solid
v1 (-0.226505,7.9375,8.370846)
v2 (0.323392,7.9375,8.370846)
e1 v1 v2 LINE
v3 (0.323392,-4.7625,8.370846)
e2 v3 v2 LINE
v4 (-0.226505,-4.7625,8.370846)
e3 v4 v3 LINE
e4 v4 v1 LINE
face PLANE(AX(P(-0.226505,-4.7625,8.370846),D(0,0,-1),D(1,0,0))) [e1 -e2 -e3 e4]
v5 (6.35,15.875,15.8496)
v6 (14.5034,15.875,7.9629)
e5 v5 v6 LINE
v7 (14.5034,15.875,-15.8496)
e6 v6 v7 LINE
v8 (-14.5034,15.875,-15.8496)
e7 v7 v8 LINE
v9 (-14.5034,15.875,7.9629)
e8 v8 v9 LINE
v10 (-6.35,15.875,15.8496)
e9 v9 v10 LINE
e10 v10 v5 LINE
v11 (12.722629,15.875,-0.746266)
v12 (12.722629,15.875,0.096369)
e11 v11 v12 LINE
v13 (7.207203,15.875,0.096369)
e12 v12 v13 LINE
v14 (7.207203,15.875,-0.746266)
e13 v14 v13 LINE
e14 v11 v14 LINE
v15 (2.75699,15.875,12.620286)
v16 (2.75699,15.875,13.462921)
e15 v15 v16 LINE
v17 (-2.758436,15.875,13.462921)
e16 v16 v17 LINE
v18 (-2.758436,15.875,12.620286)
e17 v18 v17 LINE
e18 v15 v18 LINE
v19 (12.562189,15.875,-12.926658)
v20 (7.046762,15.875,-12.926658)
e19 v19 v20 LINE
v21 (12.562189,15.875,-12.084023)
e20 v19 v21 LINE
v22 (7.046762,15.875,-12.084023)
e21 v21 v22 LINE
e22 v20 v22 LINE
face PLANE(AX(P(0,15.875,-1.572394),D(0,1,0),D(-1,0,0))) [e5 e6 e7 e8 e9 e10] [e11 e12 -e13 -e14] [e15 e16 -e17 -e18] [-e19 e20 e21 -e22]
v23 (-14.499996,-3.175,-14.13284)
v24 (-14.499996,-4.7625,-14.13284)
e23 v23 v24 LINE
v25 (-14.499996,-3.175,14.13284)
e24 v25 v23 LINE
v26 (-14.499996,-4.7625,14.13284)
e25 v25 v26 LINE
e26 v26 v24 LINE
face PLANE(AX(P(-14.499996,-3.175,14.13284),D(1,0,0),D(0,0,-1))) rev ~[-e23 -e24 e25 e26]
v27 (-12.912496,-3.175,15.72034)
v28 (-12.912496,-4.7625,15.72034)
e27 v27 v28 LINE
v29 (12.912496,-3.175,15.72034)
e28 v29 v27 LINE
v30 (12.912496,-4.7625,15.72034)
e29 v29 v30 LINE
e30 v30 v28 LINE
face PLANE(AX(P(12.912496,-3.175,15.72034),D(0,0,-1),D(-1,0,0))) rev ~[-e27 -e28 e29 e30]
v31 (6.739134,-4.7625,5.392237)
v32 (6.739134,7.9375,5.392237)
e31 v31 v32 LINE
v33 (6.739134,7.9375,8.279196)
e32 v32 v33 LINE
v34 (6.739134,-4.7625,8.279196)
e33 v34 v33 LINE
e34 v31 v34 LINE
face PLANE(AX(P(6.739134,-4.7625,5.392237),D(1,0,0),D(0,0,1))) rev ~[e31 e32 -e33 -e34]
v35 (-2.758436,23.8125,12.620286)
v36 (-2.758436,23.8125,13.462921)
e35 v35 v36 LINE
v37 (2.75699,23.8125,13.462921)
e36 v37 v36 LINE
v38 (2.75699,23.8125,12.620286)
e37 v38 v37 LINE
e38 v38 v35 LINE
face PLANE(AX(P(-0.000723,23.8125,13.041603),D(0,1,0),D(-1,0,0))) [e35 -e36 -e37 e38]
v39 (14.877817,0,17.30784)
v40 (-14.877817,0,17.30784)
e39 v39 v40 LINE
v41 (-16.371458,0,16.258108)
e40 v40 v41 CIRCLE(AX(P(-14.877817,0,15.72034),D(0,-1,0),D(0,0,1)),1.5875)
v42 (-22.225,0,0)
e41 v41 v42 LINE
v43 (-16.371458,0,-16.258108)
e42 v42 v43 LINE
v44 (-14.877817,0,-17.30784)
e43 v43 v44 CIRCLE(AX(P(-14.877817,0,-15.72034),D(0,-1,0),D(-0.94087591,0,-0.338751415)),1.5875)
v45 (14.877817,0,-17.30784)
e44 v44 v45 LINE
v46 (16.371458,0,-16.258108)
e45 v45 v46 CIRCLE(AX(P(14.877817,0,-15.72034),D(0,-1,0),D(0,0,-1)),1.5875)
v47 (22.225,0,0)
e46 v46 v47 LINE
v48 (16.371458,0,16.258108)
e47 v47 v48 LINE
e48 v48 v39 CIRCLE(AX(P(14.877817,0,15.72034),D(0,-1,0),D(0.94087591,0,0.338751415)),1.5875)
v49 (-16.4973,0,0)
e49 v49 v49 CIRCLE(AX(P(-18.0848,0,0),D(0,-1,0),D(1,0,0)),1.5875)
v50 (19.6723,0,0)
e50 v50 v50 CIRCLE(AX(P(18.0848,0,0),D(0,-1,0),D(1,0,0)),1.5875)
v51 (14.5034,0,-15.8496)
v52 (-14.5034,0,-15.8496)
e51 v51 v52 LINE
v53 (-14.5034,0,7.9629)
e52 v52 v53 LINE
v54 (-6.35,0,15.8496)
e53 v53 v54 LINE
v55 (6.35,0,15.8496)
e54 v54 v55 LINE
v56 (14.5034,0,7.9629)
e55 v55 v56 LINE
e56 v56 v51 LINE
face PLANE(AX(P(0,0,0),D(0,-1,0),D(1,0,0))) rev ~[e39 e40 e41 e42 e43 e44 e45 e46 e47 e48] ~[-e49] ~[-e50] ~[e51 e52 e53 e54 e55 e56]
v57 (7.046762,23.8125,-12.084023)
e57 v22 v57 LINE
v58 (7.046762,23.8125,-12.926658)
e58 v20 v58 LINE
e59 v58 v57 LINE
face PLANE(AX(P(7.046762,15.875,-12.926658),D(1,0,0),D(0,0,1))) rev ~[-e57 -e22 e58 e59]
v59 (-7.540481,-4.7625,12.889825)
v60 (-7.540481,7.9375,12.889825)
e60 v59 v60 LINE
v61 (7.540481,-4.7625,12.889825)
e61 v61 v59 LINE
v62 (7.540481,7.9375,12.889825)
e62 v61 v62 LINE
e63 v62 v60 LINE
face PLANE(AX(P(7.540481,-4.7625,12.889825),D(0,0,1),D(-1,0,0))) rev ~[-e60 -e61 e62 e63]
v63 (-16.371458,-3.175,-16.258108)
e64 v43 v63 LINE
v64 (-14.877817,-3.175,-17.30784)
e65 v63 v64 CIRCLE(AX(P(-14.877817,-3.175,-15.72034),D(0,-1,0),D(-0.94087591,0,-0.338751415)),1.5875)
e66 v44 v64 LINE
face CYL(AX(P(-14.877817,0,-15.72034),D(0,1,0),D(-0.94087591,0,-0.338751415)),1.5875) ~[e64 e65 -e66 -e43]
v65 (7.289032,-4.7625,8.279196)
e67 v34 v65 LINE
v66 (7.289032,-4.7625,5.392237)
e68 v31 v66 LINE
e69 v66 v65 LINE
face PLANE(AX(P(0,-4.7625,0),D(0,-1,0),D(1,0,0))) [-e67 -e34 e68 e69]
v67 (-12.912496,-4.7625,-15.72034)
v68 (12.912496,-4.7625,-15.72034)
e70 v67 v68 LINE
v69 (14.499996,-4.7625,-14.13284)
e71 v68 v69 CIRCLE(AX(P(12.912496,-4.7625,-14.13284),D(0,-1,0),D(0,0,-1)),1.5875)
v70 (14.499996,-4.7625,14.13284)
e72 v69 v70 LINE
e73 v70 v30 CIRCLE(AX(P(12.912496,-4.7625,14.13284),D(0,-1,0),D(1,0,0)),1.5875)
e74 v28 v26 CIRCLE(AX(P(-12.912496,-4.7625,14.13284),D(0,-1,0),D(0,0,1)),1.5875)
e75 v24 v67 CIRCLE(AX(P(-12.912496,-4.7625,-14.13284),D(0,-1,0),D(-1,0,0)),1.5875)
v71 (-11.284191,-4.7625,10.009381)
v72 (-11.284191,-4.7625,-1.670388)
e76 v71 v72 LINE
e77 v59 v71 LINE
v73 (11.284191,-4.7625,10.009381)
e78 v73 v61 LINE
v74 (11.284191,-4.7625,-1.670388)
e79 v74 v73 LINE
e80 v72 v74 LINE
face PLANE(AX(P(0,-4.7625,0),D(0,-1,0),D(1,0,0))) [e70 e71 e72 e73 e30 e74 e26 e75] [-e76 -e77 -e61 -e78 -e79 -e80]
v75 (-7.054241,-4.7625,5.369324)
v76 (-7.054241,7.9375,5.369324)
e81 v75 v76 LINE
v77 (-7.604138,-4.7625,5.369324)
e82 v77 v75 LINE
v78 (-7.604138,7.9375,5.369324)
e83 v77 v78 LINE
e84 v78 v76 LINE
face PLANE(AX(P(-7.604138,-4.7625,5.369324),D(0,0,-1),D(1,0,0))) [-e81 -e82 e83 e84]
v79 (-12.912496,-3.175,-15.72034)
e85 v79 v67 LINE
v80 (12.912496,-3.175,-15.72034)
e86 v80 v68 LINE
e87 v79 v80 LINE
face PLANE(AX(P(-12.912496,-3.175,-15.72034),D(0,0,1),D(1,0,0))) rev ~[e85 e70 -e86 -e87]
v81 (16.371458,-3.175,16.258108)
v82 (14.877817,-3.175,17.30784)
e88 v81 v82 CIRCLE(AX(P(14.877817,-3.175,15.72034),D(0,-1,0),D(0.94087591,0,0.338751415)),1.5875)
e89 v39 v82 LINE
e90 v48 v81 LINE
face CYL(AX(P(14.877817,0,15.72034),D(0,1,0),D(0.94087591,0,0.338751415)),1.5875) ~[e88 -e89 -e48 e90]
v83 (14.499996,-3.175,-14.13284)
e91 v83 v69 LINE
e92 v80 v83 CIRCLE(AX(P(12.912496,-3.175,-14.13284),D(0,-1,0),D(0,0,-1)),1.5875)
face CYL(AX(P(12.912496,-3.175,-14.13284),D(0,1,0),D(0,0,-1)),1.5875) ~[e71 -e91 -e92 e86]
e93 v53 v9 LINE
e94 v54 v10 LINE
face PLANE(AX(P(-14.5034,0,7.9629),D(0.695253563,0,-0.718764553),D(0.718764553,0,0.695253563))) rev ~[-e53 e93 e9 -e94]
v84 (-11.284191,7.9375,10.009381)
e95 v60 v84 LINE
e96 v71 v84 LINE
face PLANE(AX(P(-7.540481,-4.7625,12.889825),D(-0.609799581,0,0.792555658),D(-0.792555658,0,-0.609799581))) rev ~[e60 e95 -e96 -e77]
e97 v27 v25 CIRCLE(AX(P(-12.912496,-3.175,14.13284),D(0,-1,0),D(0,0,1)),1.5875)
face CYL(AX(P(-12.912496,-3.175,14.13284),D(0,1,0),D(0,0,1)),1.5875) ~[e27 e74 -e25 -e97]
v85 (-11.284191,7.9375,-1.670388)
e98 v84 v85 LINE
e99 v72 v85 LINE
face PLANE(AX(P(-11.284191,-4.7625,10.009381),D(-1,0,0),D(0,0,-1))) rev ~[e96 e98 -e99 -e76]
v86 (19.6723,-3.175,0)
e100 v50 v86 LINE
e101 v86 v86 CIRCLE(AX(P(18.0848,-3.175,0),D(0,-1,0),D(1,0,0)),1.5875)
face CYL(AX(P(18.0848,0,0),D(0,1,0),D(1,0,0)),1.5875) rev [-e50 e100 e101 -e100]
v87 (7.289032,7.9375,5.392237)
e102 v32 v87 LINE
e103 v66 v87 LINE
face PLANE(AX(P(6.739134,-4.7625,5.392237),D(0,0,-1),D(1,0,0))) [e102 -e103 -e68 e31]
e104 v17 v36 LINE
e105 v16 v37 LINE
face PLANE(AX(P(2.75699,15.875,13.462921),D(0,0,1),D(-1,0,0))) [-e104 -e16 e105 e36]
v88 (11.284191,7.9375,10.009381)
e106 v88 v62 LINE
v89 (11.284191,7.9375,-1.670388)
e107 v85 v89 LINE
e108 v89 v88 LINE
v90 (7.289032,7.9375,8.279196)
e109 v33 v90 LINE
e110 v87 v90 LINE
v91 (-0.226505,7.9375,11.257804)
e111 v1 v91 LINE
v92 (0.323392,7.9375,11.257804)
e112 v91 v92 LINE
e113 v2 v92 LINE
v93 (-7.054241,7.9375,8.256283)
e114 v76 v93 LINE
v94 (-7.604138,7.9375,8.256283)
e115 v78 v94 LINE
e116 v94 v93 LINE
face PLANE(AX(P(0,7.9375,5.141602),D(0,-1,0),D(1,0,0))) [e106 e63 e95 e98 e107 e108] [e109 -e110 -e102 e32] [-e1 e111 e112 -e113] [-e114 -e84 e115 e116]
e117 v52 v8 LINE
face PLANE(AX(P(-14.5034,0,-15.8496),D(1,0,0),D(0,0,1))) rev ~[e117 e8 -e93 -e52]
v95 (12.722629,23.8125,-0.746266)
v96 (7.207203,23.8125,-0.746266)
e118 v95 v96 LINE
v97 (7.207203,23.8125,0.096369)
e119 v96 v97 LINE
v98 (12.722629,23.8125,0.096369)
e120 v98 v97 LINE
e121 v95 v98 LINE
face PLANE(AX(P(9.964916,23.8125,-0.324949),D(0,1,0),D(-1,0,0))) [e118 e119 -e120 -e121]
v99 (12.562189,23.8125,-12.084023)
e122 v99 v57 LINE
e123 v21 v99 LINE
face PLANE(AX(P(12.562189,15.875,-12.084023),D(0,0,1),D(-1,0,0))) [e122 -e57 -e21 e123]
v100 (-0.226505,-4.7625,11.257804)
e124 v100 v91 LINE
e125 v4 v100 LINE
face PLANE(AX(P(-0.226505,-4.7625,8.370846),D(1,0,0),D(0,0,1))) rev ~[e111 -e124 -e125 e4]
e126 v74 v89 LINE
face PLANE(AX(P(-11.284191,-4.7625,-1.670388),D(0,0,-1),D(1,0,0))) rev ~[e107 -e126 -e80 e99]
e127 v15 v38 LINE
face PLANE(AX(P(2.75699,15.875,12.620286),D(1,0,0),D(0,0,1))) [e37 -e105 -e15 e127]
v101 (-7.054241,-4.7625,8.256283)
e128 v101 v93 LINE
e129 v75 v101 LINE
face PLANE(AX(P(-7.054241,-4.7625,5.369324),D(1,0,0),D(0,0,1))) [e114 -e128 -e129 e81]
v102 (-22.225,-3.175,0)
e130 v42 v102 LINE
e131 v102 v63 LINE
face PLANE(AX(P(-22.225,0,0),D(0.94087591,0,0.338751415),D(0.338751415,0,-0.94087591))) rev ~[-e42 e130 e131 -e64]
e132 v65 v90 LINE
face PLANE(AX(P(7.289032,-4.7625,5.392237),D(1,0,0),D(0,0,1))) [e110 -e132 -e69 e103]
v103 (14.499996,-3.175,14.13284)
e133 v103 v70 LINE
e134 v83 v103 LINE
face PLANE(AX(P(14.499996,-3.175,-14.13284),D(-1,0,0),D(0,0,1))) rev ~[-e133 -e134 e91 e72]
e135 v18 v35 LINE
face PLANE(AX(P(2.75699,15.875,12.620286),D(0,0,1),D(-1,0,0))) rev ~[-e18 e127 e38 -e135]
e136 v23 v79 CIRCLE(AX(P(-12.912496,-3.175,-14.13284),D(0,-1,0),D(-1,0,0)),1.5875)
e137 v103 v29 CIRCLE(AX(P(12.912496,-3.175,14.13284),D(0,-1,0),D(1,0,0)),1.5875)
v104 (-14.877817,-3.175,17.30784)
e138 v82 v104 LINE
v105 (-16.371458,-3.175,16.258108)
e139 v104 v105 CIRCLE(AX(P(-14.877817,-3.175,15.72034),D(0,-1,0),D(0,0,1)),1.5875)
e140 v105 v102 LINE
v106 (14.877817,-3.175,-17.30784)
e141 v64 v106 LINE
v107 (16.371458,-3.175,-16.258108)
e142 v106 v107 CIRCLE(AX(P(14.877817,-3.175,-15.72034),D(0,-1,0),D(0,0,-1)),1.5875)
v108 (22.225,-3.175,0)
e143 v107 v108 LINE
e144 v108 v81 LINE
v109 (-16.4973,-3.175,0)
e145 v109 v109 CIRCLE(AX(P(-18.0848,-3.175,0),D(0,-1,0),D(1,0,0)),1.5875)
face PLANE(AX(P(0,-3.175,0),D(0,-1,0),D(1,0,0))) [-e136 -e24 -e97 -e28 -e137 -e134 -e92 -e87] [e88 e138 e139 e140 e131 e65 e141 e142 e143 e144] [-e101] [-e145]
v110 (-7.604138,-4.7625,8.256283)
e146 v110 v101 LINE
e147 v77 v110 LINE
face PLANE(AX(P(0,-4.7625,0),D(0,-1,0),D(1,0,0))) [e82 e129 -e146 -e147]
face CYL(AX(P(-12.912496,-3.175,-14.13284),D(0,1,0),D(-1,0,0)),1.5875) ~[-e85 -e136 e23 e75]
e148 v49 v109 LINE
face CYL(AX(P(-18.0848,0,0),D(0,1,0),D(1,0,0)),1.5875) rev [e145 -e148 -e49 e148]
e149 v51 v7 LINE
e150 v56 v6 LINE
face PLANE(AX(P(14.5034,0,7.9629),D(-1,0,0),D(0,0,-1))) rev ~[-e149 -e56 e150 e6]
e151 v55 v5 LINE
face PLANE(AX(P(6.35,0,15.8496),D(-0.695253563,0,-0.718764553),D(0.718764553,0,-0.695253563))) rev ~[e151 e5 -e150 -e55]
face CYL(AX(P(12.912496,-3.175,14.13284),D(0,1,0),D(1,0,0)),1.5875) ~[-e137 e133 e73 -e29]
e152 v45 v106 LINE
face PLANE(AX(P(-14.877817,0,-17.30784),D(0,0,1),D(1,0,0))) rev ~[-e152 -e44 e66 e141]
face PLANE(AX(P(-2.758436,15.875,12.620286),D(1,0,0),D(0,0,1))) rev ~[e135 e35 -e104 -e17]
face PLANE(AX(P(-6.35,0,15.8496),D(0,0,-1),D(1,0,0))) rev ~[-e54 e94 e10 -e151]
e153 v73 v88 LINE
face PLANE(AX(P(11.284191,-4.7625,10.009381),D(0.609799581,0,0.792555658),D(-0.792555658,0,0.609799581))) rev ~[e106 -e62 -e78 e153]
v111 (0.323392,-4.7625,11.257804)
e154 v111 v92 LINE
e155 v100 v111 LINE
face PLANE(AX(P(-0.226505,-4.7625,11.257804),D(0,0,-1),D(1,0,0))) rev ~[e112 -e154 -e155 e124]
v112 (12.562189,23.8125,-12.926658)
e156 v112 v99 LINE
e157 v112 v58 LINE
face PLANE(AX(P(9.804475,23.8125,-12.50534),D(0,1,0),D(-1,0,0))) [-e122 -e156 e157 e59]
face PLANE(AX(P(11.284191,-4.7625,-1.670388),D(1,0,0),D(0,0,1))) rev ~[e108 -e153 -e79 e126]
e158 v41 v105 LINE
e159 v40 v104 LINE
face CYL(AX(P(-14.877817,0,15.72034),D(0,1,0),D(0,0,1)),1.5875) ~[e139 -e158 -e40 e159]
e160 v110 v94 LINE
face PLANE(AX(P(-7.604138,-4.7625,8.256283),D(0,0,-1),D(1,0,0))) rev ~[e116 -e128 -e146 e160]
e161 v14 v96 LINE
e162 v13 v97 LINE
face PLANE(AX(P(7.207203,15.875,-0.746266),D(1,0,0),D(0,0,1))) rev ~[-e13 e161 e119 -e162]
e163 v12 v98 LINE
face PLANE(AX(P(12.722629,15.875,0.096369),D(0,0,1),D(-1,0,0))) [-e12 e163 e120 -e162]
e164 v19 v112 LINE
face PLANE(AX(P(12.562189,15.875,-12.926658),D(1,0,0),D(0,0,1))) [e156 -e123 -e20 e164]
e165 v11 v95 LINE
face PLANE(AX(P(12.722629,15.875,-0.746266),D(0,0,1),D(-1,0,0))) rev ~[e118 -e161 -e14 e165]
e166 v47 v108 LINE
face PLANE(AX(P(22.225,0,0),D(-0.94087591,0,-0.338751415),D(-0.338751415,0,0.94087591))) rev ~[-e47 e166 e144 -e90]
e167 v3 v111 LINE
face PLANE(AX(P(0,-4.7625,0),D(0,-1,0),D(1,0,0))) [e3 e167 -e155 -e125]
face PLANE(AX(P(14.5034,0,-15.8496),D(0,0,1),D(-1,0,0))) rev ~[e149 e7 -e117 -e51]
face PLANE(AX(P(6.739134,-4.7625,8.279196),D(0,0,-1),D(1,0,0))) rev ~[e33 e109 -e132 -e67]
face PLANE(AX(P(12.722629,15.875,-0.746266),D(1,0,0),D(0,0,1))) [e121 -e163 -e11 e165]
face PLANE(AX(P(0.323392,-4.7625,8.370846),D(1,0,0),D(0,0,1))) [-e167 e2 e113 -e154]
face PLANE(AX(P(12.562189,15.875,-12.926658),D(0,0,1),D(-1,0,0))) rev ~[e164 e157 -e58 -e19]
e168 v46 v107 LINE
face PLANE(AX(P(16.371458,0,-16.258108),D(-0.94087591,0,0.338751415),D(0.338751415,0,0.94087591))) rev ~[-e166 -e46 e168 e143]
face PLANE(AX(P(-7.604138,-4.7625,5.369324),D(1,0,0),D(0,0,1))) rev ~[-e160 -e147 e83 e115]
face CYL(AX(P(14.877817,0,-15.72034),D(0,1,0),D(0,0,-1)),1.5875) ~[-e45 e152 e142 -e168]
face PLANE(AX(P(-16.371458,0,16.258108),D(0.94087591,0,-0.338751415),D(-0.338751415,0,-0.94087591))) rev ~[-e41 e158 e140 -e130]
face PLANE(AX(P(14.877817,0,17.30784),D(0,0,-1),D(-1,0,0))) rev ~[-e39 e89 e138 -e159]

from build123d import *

# Parameters (mm, degrees)
F0_R     = 1.5875
F1_DEPTH = 3.175
F3_DEPTH = 1.5875
F5_DEPTH = 15.875
F6_W     = 5.5154263973
F6_H     = 0.8426345885
F7_DEPTH = 7.9375
F8_W     = 0.5498970859
F8_H     = 2.8869584203
F9_DEPTH = 12.7


# Not quite as in the source:
# - a feature names something its author has since deleted; it is built from what else it names


with BuildPart() as f1:
    # F0 (on Front) → F1 (new body)
    with BuildSketch(Plane.XZ):
        with BuildLine():
            ThreePointArc((16.3714576415, 16.2581077061), (15.790628657, 17.019159057), (14.8778171338, 17.3078398343))
            Line((14.8778171338, 17.3078398343), (-14.8778171338, 17.3078398343))
            ThreePointArc((-14.8778171338, 17.3078398343), (-15.790628657, 17.019159057), (-16.3714576415, 16.2581077061))
            Line((-16.3714576415, 16.2581077061), (-22.225, 0))
            Line((-22.225, 0), (-16.3714576415, -16.2581077061))
            ThreePointArc((-16.3714576415, -16.2581077061), (-15.790628657, -17.019159057), (-14.8778171338, -17.3078398343))
            Line((-14.8778171338, -17.3078398343), (14.8778171338, -17.3078398343))
            ThreePointArc((14.8778171338, -17.3078398343), (15.790628657, -17.019159057), (16.3714576415, -16.2581077061))
            Line((16.3714576415, -16.2581077061), (22.225, 0))
            Line((22.225, 0), (16.3714576415, 16.2581077061))
        make_face()
        with Locations((-18.0848, 0)):
            Circle(F0_R, mode=Mode.SUBTRACT)
        with BuildLine():
            ThreePointArc((-14.4999964, 14.1328398343), (-14.0350284151, 15.2553718495), (-12.9124964, 15.7203398343))
            Line((-12.9124964, 15.7203398343), (12.9124964, 15.7203398343))
            ThreePointArc((12.9124964, 15.7203398343), (14.0350284151, 15.2553718495), (14.4999964, 14.1328398343))
            Line((14.4999964, 14.1328398343), (14.4999964, -14.1328398343))
            ThreePointArc((14.4999964, -14.1328398343), (14.0350284151, -15.2553718495), (12.9124964, -15.7203398343))
            Line((12.9124964, -15.7203398343), (-12.9124964, -15.7203398343))
            ThreePointArc((-12.9124964, -15.7203398343), (-14.0350284151, -15.2553718495), (-14.4999964, -14.1328398343))
            Line((-14.4999964, -14.1328398343), (-14.4999964, 14.1328398343))
        make_face(mode=Mode.SUBTRACT)
        with Locations((18.0848, 0)):
            Circle(F0_R, mode=Mode.SUBTRACT)
        with BuildLine():
            Line((12.9124964, 15.7203398343), (-12.9124964, 15.7203398343))
            ThreePointArc((-12.9124964, 15.7203398343), (-14.0350284151, 15.2553718495), (-14.4999964, 14.1328398343))
            Line((-14.4999964, 14.1328398343), (-14.4999964, -14.1328398343))
            ThreePointArc((-14.4999964, -14.1328398343), (-14.0350284151, -15.2553718495), (-12.9124964, -15.7203398343))
            Line((-12.9124964, -15.7203398343), (12.9124964, -15.7203398343))
            ThreePointArc((12.9124964, -15.7203398343), (14.0350284151, -15.2553718495), (14.4999964, -14.1328398343))
            Line((14.4999964, -14.1328398343), (14.4999964, 14.1328398343))
            ThreePointArc((14.4999964, 14.1328398343), (14.0350284151, 15.2553718495), (12.9124964, 15.7203398343))
        make_face()
    extrude(amount=F1_DEPTH)

    # F2 (on face) → F3 (join)
    with BuildSketch(Plane.XZ.offset(3.175)):
        with BuildLine():
            Line((12.9124964, 15.7203398343), (-12.9124964, 15.7203398343))
            ThreePointArc((-12.9124964, 15.7203398343), (-14.0350284151, 15.2553718495), (-14.4999964, 14.1328398343))
            Line((-14.4999964, 14.1328398343), (-14.4999964, -14.1328398343))
            ThreePointArc((-14.4999964, -14.1328398343), (-14.0350284151, -15.2553718495), (-12.9124964, -15.7203398343))
            Line((-12.9124964, -15.7203398343), (12.9124964, -15.7203398343))
            ThreePointArc((12.9124964, -15.7203398343), (14.0350284151, -15.2553718495), (14.4999964, -14.1328398343))
            Line((14.4999964, -14.1328398343), (14.4999964, 14.1328398343))
            ThreePointArc((14.4999964, 14.1328398343), (14.0350284151, 15.2553718495), (12.9124964, 15.7203398343))
        make_face()
    extrude(amount=F3_DEPTH)

    # F4 (on face) → F5 (join)
    with BuildSketch(Plane(origin=(0, 0, 0), x_dir=(-1, 0, 0), z_dir=(0, 1, 0))):
        Polygon((6.35, 15.8496), (-6.35, 15.8496), (-14.5034, 7.9629), (-14.5034, -15.8496), (14.5034, -15.8496), (14.5034, 7.9629), align=None)
    extrude(amount=F5_DEPTH)

    # F6 (on face) → F7 (join)
    with BuildSketch(Plane(origin=(0, 15.875, 0), x_dir=(-1, 0, 0), z_dir=(0, 1, 0))):
        with Locations((0.0007232884, 13.041603379)):
            Rectangle(F6_W, F6_H)
        with Locations((-9.964916273, -0.3249486908)):
            Rectangle(F6_W, F6_H)
        with Locations((-9.8044754704, -12.5053403899)):
            Rectangle(F6_W, F6_H)
    extrude(amount=F7_DEPTH)

    # F8 (on face) → F9 (cut)
    with BuildSketch(Plane.XZ.offset(4.7625)):
        Polygon((-11.2841911614, 10.0093806594), (-11.2841911614, -1.6703880579), (11.2841911614, -1.6703880579), (11.2841911614, 10.0093806594), (7.5404811705, 12.8898254096), (-7.5404811705, 12.8898254096), align=None)
        with Locations((-7.3291899171, 6.8128034472)):
            Rectangle(F8_W, F8_H, mode=Mode.SUBTRACT)
        with Locations((7.0140829775, 6.8357163109)):
            Rectangle(F8_W, F8_H, mode=Mode.SUBTRACT)
        with Locations((0.0484438497, 9.8143247887)):
            Rectangle(F8_W, F8_H, mode=Mode.SUBTRACT)
    extrude(amount=-F9_DEPTH, mode=Mode.SUBTRACT)


solid = f1.part
